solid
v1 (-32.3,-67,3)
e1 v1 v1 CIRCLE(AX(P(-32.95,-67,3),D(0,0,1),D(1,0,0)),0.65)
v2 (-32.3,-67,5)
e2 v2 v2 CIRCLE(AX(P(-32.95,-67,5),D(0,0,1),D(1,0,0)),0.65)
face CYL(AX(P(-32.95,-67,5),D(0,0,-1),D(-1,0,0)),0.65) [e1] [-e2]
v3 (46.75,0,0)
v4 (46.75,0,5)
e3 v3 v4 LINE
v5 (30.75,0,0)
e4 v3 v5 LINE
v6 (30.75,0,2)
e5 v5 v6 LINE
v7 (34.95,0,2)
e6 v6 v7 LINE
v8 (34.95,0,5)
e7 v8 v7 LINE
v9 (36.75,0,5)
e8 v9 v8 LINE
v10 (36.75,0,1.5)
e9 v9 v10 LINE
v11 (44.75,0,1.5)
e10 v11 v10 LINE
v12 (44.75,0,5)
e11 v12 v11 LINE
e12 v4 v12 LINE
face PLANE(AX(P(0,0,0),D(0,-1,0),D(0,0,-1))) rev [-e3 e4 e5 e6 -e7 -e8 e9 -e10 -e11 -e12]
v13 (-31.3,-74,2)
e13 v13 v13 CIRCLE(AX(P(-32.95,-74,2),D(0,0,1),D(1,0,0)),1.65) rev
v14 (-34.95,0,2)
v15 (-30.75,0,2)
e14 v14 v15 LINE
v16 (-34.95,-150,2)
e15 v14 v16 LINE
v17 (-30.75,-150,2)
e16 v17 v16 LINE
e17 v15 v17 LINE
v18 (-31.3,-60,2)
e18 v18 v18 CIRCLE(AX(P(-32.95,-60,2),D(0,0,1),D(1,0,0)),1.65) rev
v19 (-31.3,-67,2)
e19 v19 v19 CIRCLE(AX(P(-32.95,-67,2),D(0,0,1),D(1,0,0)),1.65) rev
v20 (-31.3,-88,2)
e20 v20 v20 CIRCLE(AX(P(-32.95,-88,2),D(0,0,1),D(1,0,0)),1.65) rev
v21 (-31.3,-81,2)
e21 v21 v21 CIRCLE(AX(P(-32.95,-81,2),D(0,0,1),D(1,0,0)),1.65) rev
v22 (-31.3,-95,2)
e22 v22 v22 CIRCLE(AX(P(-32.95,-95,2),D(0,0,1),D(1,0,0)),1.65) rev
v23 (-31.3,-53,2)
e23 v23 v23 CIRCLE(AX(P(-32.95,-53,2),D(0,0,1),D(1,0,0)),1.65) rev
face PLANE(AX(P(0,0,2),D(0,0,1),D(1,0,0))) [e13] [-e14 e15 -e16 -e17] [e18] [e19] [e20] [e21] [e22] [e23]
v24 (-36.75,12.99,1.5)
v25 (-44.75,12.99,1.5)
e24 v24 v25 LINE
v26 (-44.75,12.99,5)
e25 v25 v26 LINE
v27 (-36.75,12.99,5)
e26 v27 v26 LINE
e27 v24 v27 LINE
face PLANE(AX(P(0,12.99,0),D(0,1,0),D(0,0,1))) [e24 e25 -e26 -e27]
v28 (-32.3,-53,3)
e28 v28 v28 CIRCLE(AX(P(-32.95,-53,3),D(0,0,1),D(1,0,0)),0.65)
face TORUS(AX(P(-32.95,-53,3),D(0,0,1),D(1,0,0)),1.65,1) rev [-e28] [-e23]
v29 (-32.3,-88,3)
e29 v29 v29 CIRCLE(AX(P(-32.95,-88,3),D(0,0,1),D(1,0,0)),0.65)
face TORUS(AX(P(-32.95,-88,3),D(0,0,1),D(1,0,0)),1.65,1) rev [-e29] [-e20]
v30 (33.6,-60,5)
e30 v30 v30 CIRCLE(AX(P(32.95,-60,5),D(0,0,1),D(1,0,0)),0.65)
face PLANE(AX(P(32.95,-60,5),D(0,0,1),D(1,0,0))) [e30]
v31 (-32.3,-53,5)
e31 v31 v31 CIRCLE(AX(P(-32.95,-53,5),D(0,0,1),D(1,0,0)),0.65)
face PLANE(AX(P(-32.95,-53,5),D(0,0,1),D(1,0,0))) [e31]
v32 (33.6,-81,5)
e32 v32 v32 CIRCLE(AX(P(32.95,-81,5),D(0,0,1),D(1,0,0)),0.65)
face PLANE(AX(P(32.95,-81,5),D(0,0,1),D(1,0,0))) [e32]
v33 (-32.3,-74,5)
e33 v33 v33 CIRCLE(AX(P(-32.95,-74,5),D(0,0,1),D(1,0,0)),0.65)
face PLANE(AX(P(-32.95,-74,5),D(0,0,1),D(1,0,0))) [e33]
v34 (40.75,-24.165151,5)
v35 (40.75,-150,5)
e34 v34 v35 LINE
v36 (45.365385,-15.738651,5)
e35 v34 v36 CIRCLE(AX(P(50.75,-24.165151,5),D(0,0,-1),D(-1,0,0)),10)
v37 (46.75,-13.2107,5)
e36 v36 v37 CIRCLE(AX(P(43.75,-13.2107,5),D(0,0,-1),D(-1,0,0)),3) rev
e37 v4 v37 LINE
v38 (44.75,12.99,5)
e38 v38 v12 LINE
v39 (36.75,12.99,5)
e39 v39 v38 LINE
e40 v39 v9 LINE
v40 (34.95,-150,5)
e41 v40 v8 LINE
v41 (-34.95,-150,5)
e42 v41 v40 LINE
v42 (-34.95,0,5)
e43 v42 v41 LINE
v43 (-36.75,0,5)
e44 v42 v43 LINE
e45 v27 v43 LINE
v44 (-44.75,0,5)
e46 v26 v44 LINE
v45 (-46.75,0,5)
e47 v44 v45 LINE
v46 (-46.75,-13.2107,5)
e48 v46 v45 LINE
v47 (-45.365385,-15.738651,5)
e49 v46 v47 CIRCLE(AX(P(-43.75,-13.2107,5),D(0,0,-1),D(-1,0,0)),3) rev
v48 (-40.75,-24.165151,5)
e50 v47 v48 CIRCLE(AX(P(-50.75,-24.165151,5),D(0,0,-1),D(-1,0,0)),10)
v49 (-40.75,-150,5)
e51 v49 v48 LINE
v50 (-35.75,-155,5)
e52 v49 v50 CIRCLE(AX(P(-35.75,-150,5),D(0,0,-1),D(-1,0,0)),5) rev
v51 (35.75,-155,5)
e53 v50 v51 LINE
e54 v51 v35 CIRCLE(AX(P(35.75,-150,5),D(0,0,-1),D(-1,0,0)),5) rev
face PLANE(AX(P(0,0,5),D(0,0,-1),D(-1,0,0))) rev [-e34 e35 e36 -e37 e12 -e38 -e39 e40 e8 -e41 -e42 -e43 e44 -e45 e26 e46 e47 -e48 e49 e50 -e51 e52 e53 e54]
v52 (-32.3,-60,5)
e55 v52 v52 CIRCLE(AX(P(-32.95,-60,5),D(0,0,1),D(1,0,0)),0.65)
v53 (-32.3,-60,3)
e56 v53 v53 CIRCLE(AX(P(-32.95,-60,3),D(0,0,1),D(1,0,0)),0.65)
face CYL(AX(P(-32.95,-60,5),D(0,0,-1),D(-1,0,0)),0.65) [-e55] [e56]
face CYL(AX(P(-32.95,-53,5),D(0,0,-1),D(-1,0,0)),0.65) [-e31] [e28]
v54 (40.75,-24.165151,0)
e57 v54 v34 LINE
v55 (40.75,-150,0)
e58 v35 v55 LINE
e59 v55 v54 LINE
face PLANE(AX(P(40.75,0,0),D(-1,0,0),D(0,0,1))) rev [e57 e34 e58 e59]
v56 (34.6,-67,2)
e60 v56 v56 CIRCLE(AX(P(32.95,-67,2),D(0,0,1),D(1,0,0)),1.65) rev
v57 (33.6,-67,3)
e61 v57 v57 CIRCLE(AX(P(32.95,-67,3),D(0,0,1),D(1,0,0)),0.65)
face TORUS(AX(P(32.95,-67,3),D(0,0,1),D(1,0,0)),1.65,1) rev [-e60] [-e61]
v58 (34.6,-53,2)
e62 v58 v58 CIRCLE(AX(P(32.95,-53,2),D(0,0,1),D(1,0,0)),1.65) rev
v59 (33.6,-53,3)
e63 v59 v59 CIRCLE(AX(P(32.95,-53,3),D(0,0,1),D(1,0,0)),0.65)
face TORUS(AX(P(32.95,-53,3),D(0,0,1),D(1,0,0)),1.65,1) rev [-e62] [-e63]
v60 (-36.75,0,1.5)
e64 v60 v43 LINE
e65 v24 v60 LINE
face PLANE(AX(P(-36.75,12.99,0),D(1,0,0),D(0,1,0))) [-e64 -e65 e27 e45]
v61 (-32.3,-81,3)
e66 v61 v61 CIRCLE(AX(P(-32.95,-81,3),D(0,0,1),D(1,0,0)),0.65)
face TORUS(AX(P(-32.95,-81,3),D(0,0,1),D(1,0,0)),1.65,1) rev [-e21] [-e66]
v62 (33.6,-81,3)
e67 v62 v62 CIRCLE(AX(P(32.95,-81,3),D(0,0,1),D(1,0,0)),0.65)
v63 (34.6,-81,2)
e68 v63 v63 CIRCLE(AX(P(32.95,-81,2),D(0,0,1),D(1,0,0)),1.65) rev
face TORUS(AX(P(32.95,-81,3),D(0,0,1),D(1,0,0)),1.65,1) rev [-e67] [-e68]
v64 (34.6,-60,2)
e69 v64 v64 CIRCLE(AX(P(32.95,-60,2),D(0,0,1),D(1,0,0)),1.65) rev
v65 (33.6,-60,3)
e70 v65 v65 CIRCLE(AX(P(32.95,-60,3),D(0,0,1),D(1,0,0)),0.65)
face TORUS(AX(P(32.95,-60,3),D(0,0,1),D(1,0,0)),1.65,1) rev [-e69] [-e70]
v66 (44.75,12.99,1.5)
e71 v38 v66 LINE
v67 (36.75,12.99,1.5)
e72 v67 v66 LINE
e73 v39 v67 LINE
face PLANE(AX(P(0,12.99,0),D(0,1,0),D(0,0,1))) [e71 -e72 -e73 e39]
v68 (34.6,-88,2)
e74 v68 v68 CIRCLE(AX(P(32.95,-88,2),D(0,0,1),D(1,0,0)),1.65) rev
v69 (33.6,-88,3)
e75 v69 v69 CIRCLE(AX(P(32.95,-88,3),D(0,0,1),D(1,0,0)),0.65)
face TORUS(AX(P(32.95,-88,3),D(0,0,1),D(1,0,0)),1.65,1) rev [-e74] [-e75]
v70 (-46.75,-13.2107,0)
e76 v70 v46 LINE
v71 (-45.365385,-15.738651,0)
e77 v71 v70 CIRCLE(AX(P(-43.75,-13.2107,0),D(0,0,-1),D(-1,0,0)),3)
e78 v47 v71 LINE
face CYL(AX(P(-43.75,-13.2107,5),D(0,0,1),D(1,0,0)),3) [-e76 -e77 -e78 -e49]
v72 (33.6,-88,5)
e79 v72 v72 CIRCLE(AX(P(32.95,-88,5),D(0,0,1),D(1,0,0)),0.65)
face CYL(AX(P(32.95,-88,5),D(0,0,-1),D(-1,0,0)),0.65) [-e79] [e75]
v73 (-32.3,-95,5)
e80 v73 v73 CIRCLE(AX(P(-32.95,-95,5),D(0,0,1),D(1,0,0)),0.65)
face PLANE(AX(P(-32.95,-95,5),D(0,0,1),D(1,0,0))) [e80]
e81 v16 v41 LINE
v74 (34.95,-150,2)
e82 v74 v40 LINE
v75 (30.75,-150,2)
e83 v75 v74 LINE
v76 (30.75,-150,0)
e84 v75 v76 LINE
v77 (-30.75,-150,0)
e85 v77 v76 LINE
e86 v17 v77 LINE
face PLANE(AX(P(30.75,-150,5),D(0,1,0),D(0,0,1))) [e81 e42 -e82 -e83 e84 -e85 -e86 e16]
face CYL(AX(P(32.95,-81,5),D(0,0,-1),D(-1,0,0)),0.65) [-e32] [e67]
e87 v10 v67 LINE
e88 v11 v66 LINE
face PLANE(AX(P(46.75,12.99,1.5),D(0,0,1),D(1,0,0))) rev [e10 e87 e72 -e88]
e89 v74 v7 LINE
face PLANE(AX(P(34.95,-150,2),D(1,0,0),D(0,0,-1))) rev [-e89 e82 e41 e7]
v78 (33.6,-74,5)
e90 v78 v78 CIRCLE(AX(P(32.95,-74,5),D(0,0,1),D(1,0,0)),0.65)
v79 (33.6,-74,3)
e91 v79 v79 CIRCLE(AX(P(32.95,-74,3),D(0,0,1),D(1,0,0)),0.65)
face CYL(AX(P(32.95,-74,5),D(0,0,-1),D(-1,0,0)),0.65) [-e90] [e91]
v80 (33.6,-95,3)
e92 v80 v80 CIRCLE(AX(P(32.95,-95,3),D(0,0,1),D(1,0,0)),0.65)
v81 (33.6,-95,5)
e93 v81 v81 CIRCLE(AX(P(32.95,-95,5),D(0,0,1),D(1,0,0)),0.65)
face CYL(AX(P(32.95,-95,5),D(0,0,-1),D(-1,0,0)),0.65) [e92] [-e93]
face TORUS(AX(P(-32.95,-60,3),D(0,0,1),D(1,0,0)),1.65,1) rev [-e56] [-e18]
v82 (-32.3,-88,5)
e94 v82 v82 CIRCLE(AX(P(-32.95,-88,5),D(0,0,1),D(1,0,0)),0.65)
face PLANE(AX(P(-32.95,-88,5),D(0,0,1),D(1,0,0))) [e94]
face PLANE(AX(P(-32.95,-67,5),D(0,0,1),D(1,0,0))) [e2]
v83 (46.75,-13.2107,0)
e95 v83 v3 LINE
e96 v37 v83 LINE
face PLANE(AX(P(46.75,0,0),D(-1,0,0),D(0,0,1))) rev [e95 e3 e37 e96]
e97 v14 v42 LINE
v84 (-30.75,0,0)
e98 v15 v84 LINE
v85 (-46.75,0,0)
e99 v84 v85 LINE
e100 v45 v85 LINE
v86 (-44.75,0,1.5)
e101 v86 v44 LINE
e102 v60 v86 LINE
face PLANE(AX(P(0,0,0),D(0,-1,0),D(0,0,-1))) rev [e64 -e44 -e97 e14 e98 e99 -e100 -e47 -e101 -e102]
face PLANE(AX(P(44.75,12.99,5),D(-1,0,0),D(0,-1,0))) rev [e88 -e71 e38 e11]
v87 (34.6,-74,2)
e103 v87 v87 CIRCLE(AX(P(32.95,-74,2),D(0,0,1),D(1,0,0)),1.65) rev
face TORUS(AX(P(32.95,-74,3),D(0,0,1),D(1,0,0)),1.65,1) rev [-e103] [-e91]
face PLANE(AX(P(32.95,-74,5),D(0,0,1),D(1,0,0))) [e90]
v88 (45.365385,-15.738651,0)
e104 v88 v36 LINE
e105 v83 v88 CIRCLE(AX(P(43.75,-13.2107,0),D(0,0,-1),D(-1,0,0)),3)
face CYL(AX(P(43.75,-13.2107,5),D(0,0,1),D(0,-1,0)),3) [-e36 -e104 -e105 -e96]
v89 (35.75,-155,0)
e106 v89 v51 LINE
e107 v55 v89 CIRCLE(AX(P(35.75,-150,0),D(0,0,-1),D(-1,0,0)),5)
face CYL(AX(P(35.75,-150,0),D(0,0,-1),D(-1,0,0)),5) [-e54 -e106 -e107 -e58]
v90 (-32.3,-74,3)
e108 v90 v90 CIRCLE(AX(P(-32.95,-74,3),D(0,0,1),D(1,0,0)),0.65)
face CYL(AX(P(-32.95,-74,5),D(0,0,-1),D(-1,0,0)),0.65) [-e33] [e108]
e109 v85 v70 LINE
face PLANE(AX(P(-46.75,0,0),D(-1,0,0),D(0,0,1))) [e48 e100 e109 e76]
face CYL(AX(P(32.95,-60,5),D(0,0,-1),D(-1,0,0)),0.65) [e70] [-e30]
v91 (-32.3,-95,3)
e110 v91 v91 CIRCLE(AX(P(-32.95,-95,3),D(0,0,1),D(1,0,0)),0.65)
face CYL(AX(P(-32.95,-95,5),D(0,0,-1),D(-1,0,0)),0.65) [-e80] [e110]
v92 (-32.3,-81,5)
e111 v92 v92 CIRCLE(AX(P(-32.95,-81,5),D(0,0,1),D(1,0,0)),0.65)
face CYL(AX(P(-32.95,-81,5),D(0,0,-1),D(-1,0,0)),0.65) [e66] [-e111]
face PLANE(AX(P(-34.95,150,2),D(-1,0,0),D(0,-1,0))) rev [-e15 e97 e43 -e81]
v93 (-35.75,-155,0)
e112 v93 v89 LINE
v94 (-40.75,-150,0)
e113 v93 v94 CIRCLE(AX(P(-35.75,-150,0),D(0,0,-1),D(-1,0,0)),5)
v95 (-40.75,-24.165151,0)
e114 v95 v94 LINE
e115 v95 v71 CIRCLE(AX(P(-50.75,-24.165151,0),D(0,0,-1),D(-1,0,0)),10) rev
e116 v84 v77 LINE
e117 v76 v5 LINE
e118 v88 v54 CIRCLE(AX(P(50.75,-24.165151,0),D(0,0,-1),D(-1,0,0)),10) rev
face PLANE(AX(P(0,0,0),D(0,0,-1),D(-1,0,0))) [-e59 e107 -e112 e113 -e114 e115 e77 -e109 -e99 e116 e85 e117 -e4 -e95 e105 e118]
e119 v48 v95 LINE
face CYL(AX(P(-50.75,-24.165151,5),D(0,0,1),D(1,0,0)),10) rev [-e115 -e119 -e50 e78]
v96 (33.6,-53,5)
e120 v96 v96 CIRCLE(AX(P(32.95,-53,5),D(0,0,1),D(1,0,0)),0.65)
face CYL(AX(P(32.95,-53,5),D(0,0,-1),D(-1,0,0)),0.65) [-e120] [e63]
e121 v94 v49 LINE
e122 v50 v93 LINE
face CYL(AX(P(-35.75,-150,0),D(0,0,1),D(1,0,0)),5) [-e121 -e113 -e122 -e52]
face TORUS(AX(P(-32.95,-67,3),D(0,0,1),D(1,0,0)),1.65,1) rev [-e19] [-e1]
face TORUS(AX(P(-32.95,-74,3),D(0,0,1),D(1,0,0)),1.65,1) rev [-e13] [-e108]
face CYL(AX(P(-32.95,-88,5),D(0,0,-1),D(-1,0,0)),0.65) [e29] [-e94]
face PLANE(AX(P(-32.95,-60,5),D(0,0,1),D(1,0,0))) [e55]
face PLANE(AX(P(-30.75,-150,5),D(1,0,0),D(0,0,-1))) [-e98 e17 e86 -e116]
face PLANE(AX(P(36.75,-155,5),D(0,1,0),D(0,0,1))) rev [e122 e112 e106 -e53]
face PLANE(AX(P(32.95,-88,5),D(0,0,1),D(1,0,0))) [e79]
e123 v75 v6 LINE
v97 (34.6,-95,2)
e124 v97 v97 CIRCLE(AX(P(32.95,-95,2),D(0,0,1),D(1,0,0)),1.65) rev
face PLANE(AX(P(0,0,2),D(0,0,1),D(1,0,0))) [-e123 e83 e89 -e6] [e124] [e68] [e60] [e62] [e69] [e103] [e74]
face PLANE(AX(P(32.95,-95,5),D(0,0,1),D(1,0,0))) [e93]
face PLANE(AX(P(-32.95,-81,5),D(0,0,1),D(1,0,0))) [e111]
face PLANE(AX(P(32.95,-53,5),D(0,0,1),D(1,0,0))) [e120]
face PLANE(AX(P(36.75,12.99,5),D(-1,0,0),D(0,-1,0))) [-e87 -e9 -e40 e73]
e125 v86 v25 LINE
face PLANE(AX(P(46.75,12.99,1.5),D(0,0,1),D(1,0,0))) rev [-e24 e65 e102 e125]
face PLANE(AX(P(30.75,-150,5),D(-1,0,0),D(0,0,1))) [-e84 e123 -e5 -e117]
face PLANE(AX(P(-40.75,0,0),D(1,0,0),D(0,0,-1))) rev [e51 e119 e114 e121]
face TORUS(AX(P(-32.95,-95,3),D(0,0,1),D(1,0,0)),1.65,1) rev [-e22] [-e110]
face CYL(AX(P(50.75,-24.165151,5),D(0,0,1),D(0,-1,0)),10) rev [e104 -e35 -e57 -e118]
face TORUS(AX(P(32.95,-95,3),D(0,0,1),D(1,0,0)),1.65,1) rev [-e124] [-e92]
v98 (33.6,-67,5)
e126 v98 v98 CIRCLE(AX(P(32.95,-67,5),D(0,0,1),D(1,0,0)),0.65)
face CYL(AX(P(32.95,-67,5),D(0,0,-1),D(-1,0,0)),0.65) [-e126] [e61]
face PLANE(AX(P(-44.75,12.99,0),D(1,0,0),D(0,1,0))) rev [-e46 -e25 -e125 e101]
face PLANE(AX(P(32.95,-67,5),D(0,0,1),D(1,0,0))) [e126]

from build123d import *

# Parameters (mm, degrees)
STOCK_ARRAYRAMME_1_OUTLINE_R   = 0.65
STOCK_ARRAYRAMME_1_DEPTH       = 5
STOCK_ARRAYRAMME_1_2_OUTLINE_W = 4.2
STOCK_ARRAYRAMME_1_2_OUTLINE_H = 150
STOCK_ARRAYRAMME_1_2_OUTLINE_R = 0.65
STOCK_ARRAYRAMME_1_2_DEPTH     = 2
SKETCH1_W                      = 15
SKETCH1_H                      = 5
BOSS_EXTRUDE1_DEPTH            = 10
SKETCH2_W                      = 15
SKETCH2_H                      = 5
BOSS_EXTRUDE2_DEPTH            = 10
SKETCH3_W                      = 8
SKETCH3_H                      = 5
BOSS_EXTRUDE3_DEPTH            = 12.99
SKETCH4_W                      = 12.99
SKETCH4_H                      = 1.5
CUT_EXTRUDE1_DEPTH             = 181.061794948
FILLET5_R                      = 1
SKETCH6_W                      = 5
SKETCH6_H                      = 140
BOSS_EXTRUDE4_DEPTH            = 4
SKETCH5_W                      = 140
SKETCH5_H                      = 5
BOSS_EXTRUDE5_DEPTH            = 4
FILLET6_R                      = 10
FILLET7_R                      = 3
FILLET8_R                      = 5


# Read off the part's stored shape, not the designer's step: Stock-arrayRamme-1
with BuildPart() as part:
    # Stock-arrayRamme-1 outline → Stock-arrayRamme-1 (new body)
    with BuildSketch(Plane.XY):
        Polygon((36.75, 0), (34.95, 0), (34.95, -150), (-34.95, -150), (-34.95, 0), (-36.75, 0), (-36.75, -155), (36.75, -155), align=None)
        with Locations((-32.95, -95)):
            Circle(STOCK_ARRAYRAMME_1_OUTLINE_R)
        with Locations((-32.95, -53)):
            Circle(STOCK_ARRAYRAMME_1_OUTLINE_R)
        with Locations((-32.95, -88)):
            Circle(STOCK_ARRAYRAMME_1_OUTLINE_R)
        with Locations((-32.95, -81)):
            Circle(STOCK_ARRAYRAMME_1_OUTLINE_R)
        with Locations((-32.95, -74)):
            Circle(STOCK_ARRAYRAMME_1_OUTLINE_R)
        with Locations((-32.95, -60)):
            Circle(STOCK_ARRAYRAMME_1_OUTLINE_R)
        with Locations((-32.95, -67)):
            Circle(STOCK_ARRAYRAMME_1_OUTLINE_R)
        with Locations((32.95, -67)):
            Circle(STOCK_ARRAYRAMME_1_OUTLINE_R)
        with Locations((32.95, -60)):
            Circle(STOCK_ARRAYRAMME_1_OUTLINE_R)
        with Locations((32.95, -74)):
            Circle(STOCK_ARRAYRAMME_1_OUTLINE_R)
        with Locations((32.95, -53)):
            Circle(STOCK_ARRAYRAMME_1_OUTLINE_R)
        with Locations((32.95, -81)):
            Circle(STOCK_ARRAYRAMME_1_OUTLINE_R)
        with Locations((32.95, -88)):
            Circle(STOCK_ARRAYRAMME_1_OUTLINE_R)
        with Locations((32.95, -95)):
            Circle(STOCK_ARRAYRAMME_1_OUTLINE_R)
    extrude(amount=STOCK_ARRAYRAMME_1_DEPTH)

    # Stock-arrayRamme-1 2 outline → Stock-arrayRamme-1 2 (add)
    # profile 1 of 2: a face of its own
    with BuildSketch(Plane.XY):
        with Locations((32.85, -75)):
            Rectangle(STOCK_ARRAYRAMME_1_2_OUTLINE_W, STOCK_ARRAYRAMME_1_2_OUTLINE_H)
        with Locations((32.95, -95)):
            Circle(STOCK_ARRAYRAMME_1_2_OUTLINE_R, mode=Mode.SUBTRACT)
        with Locations((32.95, -88)):
            Circle(STOCK_ARRAYRAMME_1_2_OUTLINE_R, mode=Mode.SUBTRACT)
        with Locations((32.95, -81)):
            Circle(STOCK_ARRAYRAMME_1_2_OUTLINE_R, mode=Mode.SUBTRACT)
        with Locations((32.95, -74)):
            Circle(STOCK_ARRAYRAMME_1_2_OUTLINE_R, mode=Mode.SUBTRACT)
        with Locations((32.95, -67)):
            Circle(STOCK_ARRAYRAMME_1_2_OUTLINE_R, mode=Mode.SUBTRACT)
        with Locations((32.95, -60)):
            Circle(STOCK_ARRAYRAMME_1_2_OUTLINE_R, mode=Mode.SUBTRACT)
        with Locations((32.95, -53)):
            Circle(STOCK_ARRAYRAMME_1_2_OUTLINE_R, mode=Mode.SUBTRACT)
    # profile 2 of 2: a face of its own
    with BuildSketch(Plane.XY):
        with Locations((-32.85, -75)):
            Rectangle(STOCK_ARRAYRAMME_1_2_OUTLINE_W, STOCK_ARRAYRAMME_1_2_OUTLINE_H)
        with Locations((-32.95, -95)):
            Circle(STOCK_ARRAYRAMME_1_2_OUTLINE_R, mode=Mode.SUBTRACT)
        with Locations((-32.95, -88)):
            Circle(STOCK_ARRAYRAMME_1_2_OUTLINE_R, mode=Mode.SUBTRACT)
        with Locations((-32.95, -81)):
            Circle(STOCK_ARRAYRAMME_1_2_OUTLINE_R, mode=Mode.SUBTRACT)
        with Locations((-32.95, -74)):
            Circle(STOCK_ARRAYRAMME_1_2_OUTLINE_R, mode=Mode.SUBTRACT)
        with Locations((-32.95, -67)):
            Circle(STOCK_ARRAYRAMME_1_2_OUTLINE_R, mode=Mode.SUBTRACT)
        with Locations((-32.95, -60)):
            Circle(STOCK_ARRAYRAMME_1_2_OUTLINE_R, mode=Mode.SUBTRACT)
        with Locations((-32.95, -53)):
            Circle(STOCK_ARRAYRAMME_1_2_OUTLINE_R, mode=Mode.SUBTRACT)
    extrude(amount=STOCK_ARRAYRAMME_1_2_DEPTH)

    # Sketch1 → Boss-Extrude1 (add)
    with BuildSketch(Plane.YZ.offset(36.75)):
        with Locations((-7.5, 2.5)):
            Rectangle(SKETCH1_W, SKETCH1_H)
    extrude(amount=BOSS_EXTRUDE1_DEPTH)

    # Sketch2 → Boss-Extrude2 (add)
    with BuildSketch(Plane(origin=(-36.75, 0, 0), x_dir=(0, -1, 0), z_dir=(-1, 0, 0))):
        with Locations((7.5, 2.5)):
            Rectangle(SKETCH2_W, SKETCH2_H)
    extrude(amount=BOSS_EXTRUDE2_DEPTH)

    # Sketch3 → Boss-Extrude3 (add)
    with BuildSketch(Plane(origin=(0, 0, 0), x_dir=(-1, 0, 0), z_dir=(0, 1, 0))):
        with Locations((-40.75, 2.5)):
            Rectangle(SKETCH3_W, SKETCH3_H)
        with Locations((40.75, 2.5)):
            Rectangle(SKETCH3_W, SKETCH3_H)
    extrude(amount=BOSS_EXTRUDE3_DEPTH)

    # Sketch4 → Cut-Extrude1 (cut, through all)
    with BuildSketch(Plane(origin=(-44.75, 0, 0), x_dir=(0, -1, 0), z_dir=(-1, 0, 0))):
        with Locations((-6.495, 0.75)):
            Rectangle(SKETCH4_W, SKETCH4_H)
    extrude(amount=-CUT_EXTRUDE1_DEPTH, mode=Mode.SUBTRACT)

    # Fillet5
    fillet5_edges = [part.edges().sort_by_distance(p)[0] for p in [
        (32.3, -53, 2),
        (32.3, -74, 2),
        (32.3, -60, 2),
        (-33.6, -53, 2),
        (32.3, -67, 2),
        (-33.6, -95, 2),
        (32.3, -95, 2),
        (-33.6, -67, 2),
        (32.3, -88, 2),
        (32.3, -81, 2),
        (-33.6, -60, 2),
        (-33.6, -74, 2),
        (-33.6, -81, 2),
        (-33.6, -88, 2),
    ]]
    fillet(fillet5_edges, radius=FILLET5_R)

    # Sketch6 → Boss-Extrude4 (add)
    with BuildSketch(Plane(origin=(36.75, 0, 0), x_dir=(0, 0, -1), z_dir=(1, 0, 0))):
        with Locations((-2.5, -85)):
            Rectangle(SKETCH6_W, SKETCH6_H)
    extrude(amount=BOSS_EXTRUDE4_DEPTH)

    # Sketch5 → Boss-Extrude5 (add)
    with BuildSketch(Plane(origin=(-36.75, 0, 0), x_dir=(0, -1, 0), z_dir=(-1, 0, 0))):
        with Locations((85, 2.5)):
            Rectangle(SKETCH5_W, SKETCH5_H)
    extrude(amount=BOSS_EXTRUDE5_DEPTH)

    # Fillet6
    # the kernel refuses this fillet: 10 mm, written as the material it adds along each edge
    with BuildSketch(Plane(origin=(40.75, -15, 0), x_dir=(1, 0, 0), z_dir=(0, 0, 1))) as fillet6_piece_1:
        with BuildLine():
            CenterArc((10, -9.16515139), FILLET6_R, 113.578178478, 66.421821522)
            Line((0, -9.16515139), (-0.2, -9.16515139))
            Line((-0.2, -9.16515139), (-0.2, 0))
            Line((-0.2, 0), (0, 0.2))
            ThreePointArc((0, 0.2), (3, 0.2), (5.92, 0.183303028))
            Line((5.92, 0.183303028), (6, 0))
        make_face()
    extrude(amount=5)
    with BuildSketch(Plane(origin=(-40.75, -15, 5), x_dir=(0, -1, 0), z_dir=(0, 0, -1))) as fillet6_piece_2:
        with BuildLine():
            CenterArc((9.16515139, 10), FILLET6_R, 203.578178478, 66.421821522)
            Line((0, 6), (-0.183303028, 5.92))
            ThreePointArc((-0.183303028, 5.92), (-0.2, 3), (-0.2, 0))
            Line((-0.2, 0), (0, -0.2))
            Line((0, -0.2), (9.16515139, -0.2))
            Line((9.16515139, -0.2), (9.16515139, 0))
        make_face()
    extrude(amount=5)

    # Fillet7
    fillet7_edges = [part.edges().sort_by_distance(p)[0] for p in [
        (46.75, -15, 2.5),
        (-46.75, -15, 2.5),
    ]]
    fillet(fillet7_edges, radius=FILLET7_R)

    # Fillet8
    fillet8_edges = [part.edges().sort_by_distance(p)[0] for p in [
        (40.75, -155, 2.5),
        (-40.75, -155, 2.5),
    ]]
    fillet(fillet8_edges, radius=FILLET8_R)


solid = part.part
